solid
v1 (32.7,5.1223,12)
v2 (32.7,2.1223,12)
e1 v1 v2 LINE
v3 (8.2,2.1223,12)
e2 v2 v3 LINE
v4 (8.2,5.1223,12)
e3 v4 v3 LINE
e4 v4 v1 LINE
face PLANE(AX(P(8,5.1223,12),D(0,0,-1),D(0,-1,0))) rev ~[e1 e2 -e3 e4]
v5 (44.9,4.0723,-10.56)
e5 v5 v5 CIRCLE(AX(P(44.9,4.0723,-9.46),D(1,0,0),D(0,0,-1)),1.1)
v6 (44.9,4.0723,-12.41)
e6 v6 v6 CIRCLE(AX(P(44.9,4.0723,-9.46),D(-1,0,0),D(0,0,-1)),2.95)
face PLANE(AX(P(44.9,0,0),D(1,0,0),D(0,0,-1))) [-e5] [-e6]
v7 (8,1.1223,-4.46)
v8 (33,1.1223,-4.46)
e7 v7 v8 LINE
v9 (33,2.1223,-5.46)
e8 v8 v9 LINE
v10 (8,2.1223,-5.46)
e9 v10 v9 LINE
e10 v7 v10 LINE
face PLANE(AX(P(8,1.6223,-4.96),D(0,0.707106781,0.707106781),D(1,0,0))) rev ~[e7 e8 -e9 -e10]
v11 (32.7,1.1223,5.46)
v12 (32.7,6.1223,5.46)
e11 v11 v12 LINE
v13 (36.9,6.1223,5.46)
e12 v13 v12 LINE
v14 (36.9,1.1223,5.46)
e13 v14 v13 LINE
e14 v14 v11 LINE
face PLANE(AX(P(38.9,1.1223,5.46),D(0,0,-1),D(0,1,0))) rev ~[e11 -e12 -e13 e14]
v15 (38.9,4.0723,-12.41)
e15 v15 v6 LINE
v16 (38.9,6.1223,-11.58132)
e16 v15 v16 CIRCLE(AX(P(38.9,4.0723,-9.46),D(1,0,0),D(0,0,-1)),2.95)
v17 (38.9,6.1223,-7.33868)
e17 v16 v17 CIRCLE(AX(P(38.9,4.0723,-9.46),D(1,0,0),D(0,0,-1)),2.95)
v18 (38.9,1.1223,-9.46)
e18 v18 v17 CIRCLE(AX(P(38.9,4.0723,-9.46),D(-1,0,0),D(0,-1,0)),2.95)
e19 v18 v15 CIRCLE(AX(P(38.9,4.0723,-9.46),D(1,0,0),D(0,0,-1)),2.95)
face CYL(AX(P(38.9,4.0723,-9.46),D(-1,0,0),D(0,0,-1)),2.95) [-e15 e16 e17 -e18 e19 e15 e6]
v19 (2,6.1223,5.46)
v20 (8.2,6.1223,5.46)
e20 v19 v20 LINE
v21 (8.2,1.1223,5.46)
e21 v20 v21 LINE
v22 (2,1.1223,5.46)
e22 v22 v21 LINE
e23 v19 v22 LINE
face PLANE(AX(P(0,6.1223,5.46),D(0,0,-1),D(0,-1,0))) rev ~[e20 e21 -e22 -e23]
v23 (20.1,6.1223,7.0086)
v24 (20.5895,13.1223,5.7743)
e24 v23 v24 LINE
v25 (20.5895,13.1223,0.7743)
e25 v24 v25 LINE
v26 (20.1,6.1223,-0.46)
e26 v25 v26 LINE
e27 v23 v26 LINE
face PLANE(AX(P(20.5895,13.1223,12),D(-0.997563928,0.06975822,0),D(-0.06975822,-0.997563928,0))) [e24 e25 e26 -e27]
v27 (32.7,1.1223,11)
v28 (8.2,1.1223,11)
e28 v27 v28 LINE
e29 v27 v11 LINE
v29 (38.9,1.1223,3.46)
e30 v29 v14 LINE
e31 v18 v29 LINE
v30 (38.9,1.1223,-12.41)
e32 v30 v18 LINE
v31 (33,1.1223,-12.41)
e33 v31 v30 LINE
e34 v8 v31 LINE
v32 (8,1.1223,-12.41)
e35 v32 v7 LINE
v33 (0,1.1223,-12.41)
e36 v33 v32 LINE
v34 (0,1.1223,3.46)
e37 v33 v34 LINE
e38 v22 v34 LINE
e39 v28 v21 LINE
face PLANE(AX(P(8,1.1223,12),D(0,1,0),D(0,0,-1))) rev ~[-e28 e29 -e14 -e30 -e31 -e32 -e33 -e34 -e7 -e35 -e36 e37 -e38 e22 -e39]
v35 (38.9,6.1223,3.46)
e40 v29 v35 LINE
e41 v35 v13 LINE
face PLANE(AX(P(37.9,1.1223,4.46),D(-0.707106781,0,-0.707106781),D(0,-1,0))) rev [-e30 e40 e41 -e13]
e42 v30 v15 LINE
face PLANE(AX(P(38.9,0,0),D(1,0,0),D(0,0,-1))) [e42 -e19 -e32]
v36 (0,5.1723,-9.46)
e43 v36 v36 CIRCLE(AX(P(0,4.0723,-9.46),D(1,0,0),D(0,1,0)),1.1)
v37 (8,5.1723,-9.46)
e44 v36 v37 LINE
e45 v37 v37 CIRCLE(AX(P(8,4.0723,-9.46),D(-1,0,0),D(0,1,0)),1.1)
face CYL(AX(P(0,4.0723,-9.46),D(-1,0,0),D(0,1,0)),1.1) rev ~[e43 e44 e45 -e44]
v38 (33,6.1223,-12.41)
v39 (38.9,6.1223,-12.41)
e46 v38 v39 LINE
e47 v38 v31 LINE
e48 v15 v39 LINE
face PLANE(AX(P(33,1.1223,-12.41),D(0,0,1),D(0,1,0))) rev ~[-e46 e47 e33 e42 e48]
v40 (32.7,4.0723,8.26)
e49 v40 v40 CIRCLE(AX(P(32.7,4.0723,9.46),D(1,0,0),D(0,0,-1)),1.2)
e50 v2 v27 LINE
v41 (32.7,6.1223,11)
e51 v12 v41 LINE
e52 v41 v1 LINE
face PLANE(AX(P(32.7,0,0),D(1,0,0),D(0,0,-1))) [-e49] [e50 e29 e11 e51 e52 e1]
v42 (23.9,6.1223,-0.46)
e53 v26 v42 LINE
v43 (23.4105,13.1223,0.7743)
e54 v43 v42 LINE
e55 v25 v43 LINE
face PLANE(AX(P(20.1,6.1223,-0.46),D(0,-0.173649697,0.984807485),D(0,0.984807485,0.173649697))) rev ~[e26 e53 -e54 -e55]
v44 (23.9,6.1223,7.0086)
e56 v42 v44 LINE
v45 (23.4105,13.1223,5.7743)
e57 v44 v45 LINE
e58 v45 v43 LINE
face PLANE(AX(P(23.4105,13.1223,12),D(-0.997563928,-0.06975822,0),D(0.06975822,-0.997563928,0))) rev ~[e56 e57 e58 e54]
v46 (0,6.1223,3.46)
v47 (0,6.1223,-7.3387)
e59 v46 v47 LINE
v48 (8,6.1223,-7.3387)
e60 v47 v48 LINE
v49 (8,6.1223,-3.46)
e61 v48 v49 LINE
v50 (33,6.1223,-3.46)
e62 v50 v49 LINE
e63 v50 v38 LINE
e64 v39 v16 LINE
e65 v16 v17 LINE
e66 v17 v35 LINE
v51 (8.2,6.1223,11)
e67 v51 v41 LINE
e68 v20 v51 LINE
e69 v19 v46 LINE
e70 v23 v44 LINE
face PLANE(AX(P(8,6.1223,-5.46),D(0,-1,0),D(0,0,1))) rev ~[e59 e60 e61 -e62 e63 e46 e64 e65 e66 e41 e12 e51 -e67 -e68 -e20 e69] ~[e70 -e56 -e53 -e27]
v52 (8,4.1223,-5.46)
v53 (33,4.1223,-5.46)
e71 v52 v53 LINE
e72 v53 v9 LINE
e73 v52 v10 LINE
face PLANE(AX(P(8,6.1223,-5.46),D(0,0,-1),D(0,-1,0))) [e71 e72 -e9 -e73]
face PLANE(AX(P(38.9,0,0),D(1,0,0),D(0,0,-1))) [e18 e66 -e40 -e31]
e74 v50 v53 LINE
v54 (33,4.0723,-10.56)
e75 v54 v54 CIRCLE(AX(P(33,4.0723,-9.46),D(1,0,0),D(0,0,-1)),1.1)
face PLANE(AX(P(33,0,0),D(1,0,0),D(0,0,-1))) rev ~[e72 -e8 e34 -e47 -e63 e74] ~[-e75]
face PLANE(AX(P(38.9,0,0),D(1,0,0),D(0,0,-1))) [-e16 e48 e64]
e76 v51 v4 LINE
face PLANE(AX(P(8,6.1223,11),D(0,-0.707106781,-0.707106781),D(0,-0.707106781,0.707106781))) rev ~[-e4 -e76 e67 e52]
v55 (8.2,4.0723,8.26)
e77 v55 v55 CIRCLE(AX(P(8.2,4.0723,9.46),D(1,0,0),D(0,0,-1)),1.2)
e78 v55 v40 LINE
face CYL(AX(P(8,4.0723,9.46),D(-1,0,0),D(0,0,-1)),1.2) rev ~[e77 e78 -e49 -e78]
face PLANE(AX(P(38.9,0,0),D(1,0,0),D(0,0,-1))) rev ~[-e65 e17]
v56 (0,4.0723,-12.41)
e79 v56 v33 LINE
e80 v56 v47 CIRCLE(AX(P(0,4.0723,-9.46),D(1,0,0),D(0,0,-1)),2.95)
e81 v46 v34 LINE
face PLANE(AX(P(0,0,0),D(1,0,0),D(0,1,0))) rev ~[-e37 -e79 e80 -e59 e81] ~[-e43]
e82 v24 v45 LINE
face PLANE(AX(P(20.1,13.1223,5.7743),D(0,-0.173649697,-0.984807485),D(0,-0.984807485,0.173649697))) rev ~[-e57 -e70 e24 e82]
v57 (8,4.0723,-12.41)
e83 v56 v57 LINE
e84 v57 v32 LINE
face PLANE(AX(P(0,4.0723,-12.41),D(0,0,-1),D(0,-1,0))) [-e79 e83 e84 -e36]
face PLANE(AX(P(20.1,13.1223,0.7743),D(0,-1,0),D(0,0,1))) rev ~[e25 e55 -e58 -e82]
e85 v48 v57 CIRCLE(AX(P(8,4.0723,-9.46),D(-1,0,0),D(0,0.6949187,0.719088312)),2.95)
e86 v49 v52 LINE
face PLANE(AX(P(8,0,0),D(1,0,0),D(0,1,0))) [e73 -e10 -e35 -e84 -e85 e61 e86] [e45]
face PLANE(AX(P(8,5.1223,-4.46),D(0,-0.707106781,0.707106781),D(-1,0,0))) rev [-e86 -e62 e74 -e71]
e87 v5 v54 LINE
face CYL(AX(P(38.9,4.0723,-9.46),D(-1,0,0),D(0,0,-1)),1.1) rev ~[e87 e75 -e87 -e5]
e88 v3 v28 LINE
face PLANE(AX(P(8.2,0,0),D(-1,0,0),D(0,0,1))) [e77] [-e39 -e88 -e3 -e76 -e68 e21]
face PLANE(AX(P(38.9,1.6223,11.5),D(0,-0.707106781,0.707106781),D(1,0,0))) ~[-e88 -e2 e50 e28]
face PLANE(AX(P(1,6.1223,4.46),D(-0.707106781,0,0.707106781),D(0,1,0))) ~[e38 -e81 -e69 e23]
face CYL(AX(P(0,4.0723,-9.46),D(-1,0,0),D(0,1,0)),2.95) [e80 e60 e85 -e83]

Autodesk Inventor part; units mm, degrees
ref_plane "YZ Plane" through (0, 0, 0) normal (1, 0, 0) x (0, 1, 0)
ref_plane "XZ Plane" through (0, 0, 0) normal (0, 1, 0) x (-1, 0, 0)
ref_plane "XY Plane" through (0, 0, 0) normal (0, 0, 1) x (1, 0, 0)
sketch "草图1" plane through (0, 0, 0) normal (1, 0, 0) x (0, 1, 0)
  circle A0 centre (4.0723, -9.46) radius 2.95
  line L0 (16.324, 0) -> (-17.1797, 0)
  line L1 (1.1223, -9.46) -> (1.1223, 0)
  line L2 (6.1223, 0) -> (6.1223, -7.3387)
  circle A1 centre (4.0723, 9.46) radius 1.2
  line L3 (6.1223, 0) -> (6.1223, 11)
  line L4 (1.1223, 0) -> (1.1223, 12)
  line L5 (1.1223, 12) -> (5.1223, 12)
  circle A2 centre (4.0723, -9.46) radius 1.1
  line L6 (5.1223, 12) -> (6.1223, 11)
  line L7 (4.0723, -12.41) -> (1.1223, -12.41)
  line L8 (1.1223, -12.41) -> (1.1223, -9.46)
  point P0 (0, 0)
  dimension "d0" = 5.9
  dimension "d2" = 18.92
  dimension "d3" = 2.4
  dimension "d4" = 5
  dimension "d5" = 2.2
  dimension "d8" = 135
  dimension "d9" = 24
  dimension "d10" = 1
extrude "拉伸1" add sketch "草图1" along normal blind 8
sketch "草图2" plane through (8, 0, 0) normal (1, 0, 0) x (0, 0, -1)
  line L0 (-11, 6.1223) -> (-12, 5.1223) projected
  line L1 (-12, 5.1223) -> (-12, 1.1223) projected
  line L2 (-12, 1.1223) -> (12.41, 1.1223) projected
  line L3 (12.41, 1.1223) -> (12.41, 4.0723) projected
  arc A0 (12.41, 4.0723) -> (7.3387, 6.1223) centre (9.46, 4.0723) ccw projected
  line L4 (7.3387, 6.1223) -> (-11, 6.1223) projected
  circle A1 centre (9.46, 4.0723) radius 1.1 projected
  circle A2 centre (-9.46, 4.0723) radius 1.2 projected
  line L5 (7.3387, 6.1223) -> (-11, 6.1223) projected
  line L6 (5.46, 6.1223) -> (5.46, 1.1223)
  point P0 (0, 0)
  point P1 (5.46, 3.6223)
  dimension "d11" = 4
extrude "拉伸2" add sketch "草图2" along normal blind 25 contours L4 L6 L2 L1 L0
sketch "草图3" plane through (33, 0, 0) normal (1, 0, 0) x (0, 0, -1)
  line L0 (-12, 1.1223) -> (5.46, 1.1223) projected
  line L1 (5.46, 1.1223) -> (5.46, 6.1223) projected
  line L2 (5.46, 6.1223) -> (-11, 6.1223) projected
  line L3 (-11, 6.1223) -> (-12, 5.1223) projected
  line L4 (-12, 5.1223) -> (-12, 1.1223) projected
  circle A0 centre (-9.46, 4.0723) radius 1.2 projected
  line L5 (-12, 1.1223) -> (12.41, 1.1223) projected
  line L6 (5.46, 1.1223) -> (12.41, 1.1223)
  line L7 (12.41, 1.1223) -> (12.41, 6.1223)
  line L8 (12.41, 6.1223) -> (5.46, 6.1223)
  circle A1 centre (9.46, 4.0723) radius 1.1 projected
  arc A2 (12.41, 4.0723) -> (7.3387, 6.1223) centre (9.46, 4.0723) ccw projected
  point P0 (0, 0)
extrude "拉伸3" add sketch "草图3" along normal blind 5.9 contours L4 L3 L2 L1 L0 | L1 L8 A2 L7 L5 | A2 L8 L7
sketch "草图4" plane through (38.9, 0, 0) normal (1, 0, 0) x (0, 0, -1)
  circle A0 centre (9.46, 4.0723) radius 1.1 projected
  circle A1 centre (9.46, 4.0723) radius 2.95
  line L0 (-12, 1.1223) -> (12.41, 1.1223) projected
  point P0 (0, 0)
  point P1 (8.9146, 1.1223)
  point P2 (9.46, 1.1223)
  dimension "d16" = 5.9
extrude "拉伸4" add sketch "草图4" along normal blind 6
chamfer "倒角1" distance 2 angle 45 1 edges at (20.5, 6.1223, -5.46)
chamfer "倒角2" distance 1 angle 45 1 edges at (19.45, 1.1223, 12)
chamfer "倒角3" distance 1 angle 45 1 edges at (20.5, 1.1223, -5.46)
sketch "草图5" plane through (0, 0, 0) normal (-1, 0, 0) x (0, 0, 1)
  line L0 (-7.3387, 6.1223) -> (11, 6.1223) projected
  line L1 (5.46, 6.1223) -> (5.46, 1.1223)
  line L2 (11, 1.1223) -> (-12.41, 1.1223) projected
  circle A0 centre (9.46, 4.0723) radius 1.2 projected
  line L3 (12, 5.1223) -> (12, 2.1223) projected
  line L4 (11, 6.1223) -> (12, 5.1223) projected
  line L5 (12, 2.1223) -> (11, 1.1223) projected
  point P0 (0, 0)
  dimension "d28" = 4
extrude "拉伸5" cut sketch "草图5" against normal blind 8.2
sketch "草图6" plane through (38.9, 0, 0) normal (1, 0, 0) x (0, 0, -1)
  line L0 (-12, 5.1223) -> (-12, 2.1223) projected
  line L1 (-11, 6.1223) -> (-12, 5.1223) projected
  line L2 (-5.46, 6.1223) -> (-11, 6.1223) projected
  line L3 (-5.46, 1.1223) -> (-5.46, 6.1223) projected
  line L4 (-11, 1.1223) -> (-5.46, 1.1223) projected
  line L5 (-12, 2.1223) -> (-11, 1.1223) projected
  circle A0 centre (-9.46, 4.0723) radius 1.2 projected
  point P0 (0, 0)
extrude "拉伸6" cut sketch "草图6" against normal blind 6.2
chamfer "倒角5" distance 2 angle 45 2 edges at (38.9, 3.6223, 5.46) (0, 3.6223, 5.46)
ref_plane "工作平面1" through (20.1, 0, 0) normal (1, 0, 0) x (0, 0, -1)
sketch "草图7" plane through (20.1, 0, 0) normal (1, 0, 0) x (0, 0, -1)
  line L0 (7.3387, 6.1223) -> (-3.46, 6.1223) projected
  line L1 (0.46, 6.1223) -> (-0.7743, 13.1223)
  line L2 (-0.7743, 13.1223) -> (-5.7743, 13.1223)
  line L3 (-5.7743, 13.1223) -> (-7.0086, 6.1223)
  line L4 (-7.0086, 6.1223) -> (0.46, 6.1223)
  point P0 (0, 0)
  point P1 (7.2697, 6.1223)
  point P2 (3.46, 6.1223)
  point P3 (-3.46, 6.1223)
  dimension "d40" = 80
  dimension "d41" = 80
  dimension "d42" = 5
  dimension "d43" = 3
  dimension "d44" = 7
extrude "拉伸7" add sketch "草图7" along normal blind 3.8
sketch "草图8" plane through (8.2, 2.1223, 12) normal (0, 0, 1) x (1, 0, 0)
  line L0 (11.9, 11) -> (15.7, 11) projected
  line L1 (11.9, 11) -> (11.9, 4) projected
  line L2 (12.3895, 11) -> (11.9, 4)
  line L3 (15.7, 11) -> (15.7, 4) projected
  line L4 (15.2105, 11) -> (15.7, 4)
  line L5 (11.9, 4) -> (15.7, 4) projected
  line L6 (15.7, 4) -> (11.9, 4)
  point P0 (-8.2, -2.1223)
  dimension "d47" = 86
  dimension "d48" = 86
extrude "拉伸8" cut sketch "草图8" against normal blind 100 contours L0 L2 L1 | L0 L3 L4
properties part number "履带片"
